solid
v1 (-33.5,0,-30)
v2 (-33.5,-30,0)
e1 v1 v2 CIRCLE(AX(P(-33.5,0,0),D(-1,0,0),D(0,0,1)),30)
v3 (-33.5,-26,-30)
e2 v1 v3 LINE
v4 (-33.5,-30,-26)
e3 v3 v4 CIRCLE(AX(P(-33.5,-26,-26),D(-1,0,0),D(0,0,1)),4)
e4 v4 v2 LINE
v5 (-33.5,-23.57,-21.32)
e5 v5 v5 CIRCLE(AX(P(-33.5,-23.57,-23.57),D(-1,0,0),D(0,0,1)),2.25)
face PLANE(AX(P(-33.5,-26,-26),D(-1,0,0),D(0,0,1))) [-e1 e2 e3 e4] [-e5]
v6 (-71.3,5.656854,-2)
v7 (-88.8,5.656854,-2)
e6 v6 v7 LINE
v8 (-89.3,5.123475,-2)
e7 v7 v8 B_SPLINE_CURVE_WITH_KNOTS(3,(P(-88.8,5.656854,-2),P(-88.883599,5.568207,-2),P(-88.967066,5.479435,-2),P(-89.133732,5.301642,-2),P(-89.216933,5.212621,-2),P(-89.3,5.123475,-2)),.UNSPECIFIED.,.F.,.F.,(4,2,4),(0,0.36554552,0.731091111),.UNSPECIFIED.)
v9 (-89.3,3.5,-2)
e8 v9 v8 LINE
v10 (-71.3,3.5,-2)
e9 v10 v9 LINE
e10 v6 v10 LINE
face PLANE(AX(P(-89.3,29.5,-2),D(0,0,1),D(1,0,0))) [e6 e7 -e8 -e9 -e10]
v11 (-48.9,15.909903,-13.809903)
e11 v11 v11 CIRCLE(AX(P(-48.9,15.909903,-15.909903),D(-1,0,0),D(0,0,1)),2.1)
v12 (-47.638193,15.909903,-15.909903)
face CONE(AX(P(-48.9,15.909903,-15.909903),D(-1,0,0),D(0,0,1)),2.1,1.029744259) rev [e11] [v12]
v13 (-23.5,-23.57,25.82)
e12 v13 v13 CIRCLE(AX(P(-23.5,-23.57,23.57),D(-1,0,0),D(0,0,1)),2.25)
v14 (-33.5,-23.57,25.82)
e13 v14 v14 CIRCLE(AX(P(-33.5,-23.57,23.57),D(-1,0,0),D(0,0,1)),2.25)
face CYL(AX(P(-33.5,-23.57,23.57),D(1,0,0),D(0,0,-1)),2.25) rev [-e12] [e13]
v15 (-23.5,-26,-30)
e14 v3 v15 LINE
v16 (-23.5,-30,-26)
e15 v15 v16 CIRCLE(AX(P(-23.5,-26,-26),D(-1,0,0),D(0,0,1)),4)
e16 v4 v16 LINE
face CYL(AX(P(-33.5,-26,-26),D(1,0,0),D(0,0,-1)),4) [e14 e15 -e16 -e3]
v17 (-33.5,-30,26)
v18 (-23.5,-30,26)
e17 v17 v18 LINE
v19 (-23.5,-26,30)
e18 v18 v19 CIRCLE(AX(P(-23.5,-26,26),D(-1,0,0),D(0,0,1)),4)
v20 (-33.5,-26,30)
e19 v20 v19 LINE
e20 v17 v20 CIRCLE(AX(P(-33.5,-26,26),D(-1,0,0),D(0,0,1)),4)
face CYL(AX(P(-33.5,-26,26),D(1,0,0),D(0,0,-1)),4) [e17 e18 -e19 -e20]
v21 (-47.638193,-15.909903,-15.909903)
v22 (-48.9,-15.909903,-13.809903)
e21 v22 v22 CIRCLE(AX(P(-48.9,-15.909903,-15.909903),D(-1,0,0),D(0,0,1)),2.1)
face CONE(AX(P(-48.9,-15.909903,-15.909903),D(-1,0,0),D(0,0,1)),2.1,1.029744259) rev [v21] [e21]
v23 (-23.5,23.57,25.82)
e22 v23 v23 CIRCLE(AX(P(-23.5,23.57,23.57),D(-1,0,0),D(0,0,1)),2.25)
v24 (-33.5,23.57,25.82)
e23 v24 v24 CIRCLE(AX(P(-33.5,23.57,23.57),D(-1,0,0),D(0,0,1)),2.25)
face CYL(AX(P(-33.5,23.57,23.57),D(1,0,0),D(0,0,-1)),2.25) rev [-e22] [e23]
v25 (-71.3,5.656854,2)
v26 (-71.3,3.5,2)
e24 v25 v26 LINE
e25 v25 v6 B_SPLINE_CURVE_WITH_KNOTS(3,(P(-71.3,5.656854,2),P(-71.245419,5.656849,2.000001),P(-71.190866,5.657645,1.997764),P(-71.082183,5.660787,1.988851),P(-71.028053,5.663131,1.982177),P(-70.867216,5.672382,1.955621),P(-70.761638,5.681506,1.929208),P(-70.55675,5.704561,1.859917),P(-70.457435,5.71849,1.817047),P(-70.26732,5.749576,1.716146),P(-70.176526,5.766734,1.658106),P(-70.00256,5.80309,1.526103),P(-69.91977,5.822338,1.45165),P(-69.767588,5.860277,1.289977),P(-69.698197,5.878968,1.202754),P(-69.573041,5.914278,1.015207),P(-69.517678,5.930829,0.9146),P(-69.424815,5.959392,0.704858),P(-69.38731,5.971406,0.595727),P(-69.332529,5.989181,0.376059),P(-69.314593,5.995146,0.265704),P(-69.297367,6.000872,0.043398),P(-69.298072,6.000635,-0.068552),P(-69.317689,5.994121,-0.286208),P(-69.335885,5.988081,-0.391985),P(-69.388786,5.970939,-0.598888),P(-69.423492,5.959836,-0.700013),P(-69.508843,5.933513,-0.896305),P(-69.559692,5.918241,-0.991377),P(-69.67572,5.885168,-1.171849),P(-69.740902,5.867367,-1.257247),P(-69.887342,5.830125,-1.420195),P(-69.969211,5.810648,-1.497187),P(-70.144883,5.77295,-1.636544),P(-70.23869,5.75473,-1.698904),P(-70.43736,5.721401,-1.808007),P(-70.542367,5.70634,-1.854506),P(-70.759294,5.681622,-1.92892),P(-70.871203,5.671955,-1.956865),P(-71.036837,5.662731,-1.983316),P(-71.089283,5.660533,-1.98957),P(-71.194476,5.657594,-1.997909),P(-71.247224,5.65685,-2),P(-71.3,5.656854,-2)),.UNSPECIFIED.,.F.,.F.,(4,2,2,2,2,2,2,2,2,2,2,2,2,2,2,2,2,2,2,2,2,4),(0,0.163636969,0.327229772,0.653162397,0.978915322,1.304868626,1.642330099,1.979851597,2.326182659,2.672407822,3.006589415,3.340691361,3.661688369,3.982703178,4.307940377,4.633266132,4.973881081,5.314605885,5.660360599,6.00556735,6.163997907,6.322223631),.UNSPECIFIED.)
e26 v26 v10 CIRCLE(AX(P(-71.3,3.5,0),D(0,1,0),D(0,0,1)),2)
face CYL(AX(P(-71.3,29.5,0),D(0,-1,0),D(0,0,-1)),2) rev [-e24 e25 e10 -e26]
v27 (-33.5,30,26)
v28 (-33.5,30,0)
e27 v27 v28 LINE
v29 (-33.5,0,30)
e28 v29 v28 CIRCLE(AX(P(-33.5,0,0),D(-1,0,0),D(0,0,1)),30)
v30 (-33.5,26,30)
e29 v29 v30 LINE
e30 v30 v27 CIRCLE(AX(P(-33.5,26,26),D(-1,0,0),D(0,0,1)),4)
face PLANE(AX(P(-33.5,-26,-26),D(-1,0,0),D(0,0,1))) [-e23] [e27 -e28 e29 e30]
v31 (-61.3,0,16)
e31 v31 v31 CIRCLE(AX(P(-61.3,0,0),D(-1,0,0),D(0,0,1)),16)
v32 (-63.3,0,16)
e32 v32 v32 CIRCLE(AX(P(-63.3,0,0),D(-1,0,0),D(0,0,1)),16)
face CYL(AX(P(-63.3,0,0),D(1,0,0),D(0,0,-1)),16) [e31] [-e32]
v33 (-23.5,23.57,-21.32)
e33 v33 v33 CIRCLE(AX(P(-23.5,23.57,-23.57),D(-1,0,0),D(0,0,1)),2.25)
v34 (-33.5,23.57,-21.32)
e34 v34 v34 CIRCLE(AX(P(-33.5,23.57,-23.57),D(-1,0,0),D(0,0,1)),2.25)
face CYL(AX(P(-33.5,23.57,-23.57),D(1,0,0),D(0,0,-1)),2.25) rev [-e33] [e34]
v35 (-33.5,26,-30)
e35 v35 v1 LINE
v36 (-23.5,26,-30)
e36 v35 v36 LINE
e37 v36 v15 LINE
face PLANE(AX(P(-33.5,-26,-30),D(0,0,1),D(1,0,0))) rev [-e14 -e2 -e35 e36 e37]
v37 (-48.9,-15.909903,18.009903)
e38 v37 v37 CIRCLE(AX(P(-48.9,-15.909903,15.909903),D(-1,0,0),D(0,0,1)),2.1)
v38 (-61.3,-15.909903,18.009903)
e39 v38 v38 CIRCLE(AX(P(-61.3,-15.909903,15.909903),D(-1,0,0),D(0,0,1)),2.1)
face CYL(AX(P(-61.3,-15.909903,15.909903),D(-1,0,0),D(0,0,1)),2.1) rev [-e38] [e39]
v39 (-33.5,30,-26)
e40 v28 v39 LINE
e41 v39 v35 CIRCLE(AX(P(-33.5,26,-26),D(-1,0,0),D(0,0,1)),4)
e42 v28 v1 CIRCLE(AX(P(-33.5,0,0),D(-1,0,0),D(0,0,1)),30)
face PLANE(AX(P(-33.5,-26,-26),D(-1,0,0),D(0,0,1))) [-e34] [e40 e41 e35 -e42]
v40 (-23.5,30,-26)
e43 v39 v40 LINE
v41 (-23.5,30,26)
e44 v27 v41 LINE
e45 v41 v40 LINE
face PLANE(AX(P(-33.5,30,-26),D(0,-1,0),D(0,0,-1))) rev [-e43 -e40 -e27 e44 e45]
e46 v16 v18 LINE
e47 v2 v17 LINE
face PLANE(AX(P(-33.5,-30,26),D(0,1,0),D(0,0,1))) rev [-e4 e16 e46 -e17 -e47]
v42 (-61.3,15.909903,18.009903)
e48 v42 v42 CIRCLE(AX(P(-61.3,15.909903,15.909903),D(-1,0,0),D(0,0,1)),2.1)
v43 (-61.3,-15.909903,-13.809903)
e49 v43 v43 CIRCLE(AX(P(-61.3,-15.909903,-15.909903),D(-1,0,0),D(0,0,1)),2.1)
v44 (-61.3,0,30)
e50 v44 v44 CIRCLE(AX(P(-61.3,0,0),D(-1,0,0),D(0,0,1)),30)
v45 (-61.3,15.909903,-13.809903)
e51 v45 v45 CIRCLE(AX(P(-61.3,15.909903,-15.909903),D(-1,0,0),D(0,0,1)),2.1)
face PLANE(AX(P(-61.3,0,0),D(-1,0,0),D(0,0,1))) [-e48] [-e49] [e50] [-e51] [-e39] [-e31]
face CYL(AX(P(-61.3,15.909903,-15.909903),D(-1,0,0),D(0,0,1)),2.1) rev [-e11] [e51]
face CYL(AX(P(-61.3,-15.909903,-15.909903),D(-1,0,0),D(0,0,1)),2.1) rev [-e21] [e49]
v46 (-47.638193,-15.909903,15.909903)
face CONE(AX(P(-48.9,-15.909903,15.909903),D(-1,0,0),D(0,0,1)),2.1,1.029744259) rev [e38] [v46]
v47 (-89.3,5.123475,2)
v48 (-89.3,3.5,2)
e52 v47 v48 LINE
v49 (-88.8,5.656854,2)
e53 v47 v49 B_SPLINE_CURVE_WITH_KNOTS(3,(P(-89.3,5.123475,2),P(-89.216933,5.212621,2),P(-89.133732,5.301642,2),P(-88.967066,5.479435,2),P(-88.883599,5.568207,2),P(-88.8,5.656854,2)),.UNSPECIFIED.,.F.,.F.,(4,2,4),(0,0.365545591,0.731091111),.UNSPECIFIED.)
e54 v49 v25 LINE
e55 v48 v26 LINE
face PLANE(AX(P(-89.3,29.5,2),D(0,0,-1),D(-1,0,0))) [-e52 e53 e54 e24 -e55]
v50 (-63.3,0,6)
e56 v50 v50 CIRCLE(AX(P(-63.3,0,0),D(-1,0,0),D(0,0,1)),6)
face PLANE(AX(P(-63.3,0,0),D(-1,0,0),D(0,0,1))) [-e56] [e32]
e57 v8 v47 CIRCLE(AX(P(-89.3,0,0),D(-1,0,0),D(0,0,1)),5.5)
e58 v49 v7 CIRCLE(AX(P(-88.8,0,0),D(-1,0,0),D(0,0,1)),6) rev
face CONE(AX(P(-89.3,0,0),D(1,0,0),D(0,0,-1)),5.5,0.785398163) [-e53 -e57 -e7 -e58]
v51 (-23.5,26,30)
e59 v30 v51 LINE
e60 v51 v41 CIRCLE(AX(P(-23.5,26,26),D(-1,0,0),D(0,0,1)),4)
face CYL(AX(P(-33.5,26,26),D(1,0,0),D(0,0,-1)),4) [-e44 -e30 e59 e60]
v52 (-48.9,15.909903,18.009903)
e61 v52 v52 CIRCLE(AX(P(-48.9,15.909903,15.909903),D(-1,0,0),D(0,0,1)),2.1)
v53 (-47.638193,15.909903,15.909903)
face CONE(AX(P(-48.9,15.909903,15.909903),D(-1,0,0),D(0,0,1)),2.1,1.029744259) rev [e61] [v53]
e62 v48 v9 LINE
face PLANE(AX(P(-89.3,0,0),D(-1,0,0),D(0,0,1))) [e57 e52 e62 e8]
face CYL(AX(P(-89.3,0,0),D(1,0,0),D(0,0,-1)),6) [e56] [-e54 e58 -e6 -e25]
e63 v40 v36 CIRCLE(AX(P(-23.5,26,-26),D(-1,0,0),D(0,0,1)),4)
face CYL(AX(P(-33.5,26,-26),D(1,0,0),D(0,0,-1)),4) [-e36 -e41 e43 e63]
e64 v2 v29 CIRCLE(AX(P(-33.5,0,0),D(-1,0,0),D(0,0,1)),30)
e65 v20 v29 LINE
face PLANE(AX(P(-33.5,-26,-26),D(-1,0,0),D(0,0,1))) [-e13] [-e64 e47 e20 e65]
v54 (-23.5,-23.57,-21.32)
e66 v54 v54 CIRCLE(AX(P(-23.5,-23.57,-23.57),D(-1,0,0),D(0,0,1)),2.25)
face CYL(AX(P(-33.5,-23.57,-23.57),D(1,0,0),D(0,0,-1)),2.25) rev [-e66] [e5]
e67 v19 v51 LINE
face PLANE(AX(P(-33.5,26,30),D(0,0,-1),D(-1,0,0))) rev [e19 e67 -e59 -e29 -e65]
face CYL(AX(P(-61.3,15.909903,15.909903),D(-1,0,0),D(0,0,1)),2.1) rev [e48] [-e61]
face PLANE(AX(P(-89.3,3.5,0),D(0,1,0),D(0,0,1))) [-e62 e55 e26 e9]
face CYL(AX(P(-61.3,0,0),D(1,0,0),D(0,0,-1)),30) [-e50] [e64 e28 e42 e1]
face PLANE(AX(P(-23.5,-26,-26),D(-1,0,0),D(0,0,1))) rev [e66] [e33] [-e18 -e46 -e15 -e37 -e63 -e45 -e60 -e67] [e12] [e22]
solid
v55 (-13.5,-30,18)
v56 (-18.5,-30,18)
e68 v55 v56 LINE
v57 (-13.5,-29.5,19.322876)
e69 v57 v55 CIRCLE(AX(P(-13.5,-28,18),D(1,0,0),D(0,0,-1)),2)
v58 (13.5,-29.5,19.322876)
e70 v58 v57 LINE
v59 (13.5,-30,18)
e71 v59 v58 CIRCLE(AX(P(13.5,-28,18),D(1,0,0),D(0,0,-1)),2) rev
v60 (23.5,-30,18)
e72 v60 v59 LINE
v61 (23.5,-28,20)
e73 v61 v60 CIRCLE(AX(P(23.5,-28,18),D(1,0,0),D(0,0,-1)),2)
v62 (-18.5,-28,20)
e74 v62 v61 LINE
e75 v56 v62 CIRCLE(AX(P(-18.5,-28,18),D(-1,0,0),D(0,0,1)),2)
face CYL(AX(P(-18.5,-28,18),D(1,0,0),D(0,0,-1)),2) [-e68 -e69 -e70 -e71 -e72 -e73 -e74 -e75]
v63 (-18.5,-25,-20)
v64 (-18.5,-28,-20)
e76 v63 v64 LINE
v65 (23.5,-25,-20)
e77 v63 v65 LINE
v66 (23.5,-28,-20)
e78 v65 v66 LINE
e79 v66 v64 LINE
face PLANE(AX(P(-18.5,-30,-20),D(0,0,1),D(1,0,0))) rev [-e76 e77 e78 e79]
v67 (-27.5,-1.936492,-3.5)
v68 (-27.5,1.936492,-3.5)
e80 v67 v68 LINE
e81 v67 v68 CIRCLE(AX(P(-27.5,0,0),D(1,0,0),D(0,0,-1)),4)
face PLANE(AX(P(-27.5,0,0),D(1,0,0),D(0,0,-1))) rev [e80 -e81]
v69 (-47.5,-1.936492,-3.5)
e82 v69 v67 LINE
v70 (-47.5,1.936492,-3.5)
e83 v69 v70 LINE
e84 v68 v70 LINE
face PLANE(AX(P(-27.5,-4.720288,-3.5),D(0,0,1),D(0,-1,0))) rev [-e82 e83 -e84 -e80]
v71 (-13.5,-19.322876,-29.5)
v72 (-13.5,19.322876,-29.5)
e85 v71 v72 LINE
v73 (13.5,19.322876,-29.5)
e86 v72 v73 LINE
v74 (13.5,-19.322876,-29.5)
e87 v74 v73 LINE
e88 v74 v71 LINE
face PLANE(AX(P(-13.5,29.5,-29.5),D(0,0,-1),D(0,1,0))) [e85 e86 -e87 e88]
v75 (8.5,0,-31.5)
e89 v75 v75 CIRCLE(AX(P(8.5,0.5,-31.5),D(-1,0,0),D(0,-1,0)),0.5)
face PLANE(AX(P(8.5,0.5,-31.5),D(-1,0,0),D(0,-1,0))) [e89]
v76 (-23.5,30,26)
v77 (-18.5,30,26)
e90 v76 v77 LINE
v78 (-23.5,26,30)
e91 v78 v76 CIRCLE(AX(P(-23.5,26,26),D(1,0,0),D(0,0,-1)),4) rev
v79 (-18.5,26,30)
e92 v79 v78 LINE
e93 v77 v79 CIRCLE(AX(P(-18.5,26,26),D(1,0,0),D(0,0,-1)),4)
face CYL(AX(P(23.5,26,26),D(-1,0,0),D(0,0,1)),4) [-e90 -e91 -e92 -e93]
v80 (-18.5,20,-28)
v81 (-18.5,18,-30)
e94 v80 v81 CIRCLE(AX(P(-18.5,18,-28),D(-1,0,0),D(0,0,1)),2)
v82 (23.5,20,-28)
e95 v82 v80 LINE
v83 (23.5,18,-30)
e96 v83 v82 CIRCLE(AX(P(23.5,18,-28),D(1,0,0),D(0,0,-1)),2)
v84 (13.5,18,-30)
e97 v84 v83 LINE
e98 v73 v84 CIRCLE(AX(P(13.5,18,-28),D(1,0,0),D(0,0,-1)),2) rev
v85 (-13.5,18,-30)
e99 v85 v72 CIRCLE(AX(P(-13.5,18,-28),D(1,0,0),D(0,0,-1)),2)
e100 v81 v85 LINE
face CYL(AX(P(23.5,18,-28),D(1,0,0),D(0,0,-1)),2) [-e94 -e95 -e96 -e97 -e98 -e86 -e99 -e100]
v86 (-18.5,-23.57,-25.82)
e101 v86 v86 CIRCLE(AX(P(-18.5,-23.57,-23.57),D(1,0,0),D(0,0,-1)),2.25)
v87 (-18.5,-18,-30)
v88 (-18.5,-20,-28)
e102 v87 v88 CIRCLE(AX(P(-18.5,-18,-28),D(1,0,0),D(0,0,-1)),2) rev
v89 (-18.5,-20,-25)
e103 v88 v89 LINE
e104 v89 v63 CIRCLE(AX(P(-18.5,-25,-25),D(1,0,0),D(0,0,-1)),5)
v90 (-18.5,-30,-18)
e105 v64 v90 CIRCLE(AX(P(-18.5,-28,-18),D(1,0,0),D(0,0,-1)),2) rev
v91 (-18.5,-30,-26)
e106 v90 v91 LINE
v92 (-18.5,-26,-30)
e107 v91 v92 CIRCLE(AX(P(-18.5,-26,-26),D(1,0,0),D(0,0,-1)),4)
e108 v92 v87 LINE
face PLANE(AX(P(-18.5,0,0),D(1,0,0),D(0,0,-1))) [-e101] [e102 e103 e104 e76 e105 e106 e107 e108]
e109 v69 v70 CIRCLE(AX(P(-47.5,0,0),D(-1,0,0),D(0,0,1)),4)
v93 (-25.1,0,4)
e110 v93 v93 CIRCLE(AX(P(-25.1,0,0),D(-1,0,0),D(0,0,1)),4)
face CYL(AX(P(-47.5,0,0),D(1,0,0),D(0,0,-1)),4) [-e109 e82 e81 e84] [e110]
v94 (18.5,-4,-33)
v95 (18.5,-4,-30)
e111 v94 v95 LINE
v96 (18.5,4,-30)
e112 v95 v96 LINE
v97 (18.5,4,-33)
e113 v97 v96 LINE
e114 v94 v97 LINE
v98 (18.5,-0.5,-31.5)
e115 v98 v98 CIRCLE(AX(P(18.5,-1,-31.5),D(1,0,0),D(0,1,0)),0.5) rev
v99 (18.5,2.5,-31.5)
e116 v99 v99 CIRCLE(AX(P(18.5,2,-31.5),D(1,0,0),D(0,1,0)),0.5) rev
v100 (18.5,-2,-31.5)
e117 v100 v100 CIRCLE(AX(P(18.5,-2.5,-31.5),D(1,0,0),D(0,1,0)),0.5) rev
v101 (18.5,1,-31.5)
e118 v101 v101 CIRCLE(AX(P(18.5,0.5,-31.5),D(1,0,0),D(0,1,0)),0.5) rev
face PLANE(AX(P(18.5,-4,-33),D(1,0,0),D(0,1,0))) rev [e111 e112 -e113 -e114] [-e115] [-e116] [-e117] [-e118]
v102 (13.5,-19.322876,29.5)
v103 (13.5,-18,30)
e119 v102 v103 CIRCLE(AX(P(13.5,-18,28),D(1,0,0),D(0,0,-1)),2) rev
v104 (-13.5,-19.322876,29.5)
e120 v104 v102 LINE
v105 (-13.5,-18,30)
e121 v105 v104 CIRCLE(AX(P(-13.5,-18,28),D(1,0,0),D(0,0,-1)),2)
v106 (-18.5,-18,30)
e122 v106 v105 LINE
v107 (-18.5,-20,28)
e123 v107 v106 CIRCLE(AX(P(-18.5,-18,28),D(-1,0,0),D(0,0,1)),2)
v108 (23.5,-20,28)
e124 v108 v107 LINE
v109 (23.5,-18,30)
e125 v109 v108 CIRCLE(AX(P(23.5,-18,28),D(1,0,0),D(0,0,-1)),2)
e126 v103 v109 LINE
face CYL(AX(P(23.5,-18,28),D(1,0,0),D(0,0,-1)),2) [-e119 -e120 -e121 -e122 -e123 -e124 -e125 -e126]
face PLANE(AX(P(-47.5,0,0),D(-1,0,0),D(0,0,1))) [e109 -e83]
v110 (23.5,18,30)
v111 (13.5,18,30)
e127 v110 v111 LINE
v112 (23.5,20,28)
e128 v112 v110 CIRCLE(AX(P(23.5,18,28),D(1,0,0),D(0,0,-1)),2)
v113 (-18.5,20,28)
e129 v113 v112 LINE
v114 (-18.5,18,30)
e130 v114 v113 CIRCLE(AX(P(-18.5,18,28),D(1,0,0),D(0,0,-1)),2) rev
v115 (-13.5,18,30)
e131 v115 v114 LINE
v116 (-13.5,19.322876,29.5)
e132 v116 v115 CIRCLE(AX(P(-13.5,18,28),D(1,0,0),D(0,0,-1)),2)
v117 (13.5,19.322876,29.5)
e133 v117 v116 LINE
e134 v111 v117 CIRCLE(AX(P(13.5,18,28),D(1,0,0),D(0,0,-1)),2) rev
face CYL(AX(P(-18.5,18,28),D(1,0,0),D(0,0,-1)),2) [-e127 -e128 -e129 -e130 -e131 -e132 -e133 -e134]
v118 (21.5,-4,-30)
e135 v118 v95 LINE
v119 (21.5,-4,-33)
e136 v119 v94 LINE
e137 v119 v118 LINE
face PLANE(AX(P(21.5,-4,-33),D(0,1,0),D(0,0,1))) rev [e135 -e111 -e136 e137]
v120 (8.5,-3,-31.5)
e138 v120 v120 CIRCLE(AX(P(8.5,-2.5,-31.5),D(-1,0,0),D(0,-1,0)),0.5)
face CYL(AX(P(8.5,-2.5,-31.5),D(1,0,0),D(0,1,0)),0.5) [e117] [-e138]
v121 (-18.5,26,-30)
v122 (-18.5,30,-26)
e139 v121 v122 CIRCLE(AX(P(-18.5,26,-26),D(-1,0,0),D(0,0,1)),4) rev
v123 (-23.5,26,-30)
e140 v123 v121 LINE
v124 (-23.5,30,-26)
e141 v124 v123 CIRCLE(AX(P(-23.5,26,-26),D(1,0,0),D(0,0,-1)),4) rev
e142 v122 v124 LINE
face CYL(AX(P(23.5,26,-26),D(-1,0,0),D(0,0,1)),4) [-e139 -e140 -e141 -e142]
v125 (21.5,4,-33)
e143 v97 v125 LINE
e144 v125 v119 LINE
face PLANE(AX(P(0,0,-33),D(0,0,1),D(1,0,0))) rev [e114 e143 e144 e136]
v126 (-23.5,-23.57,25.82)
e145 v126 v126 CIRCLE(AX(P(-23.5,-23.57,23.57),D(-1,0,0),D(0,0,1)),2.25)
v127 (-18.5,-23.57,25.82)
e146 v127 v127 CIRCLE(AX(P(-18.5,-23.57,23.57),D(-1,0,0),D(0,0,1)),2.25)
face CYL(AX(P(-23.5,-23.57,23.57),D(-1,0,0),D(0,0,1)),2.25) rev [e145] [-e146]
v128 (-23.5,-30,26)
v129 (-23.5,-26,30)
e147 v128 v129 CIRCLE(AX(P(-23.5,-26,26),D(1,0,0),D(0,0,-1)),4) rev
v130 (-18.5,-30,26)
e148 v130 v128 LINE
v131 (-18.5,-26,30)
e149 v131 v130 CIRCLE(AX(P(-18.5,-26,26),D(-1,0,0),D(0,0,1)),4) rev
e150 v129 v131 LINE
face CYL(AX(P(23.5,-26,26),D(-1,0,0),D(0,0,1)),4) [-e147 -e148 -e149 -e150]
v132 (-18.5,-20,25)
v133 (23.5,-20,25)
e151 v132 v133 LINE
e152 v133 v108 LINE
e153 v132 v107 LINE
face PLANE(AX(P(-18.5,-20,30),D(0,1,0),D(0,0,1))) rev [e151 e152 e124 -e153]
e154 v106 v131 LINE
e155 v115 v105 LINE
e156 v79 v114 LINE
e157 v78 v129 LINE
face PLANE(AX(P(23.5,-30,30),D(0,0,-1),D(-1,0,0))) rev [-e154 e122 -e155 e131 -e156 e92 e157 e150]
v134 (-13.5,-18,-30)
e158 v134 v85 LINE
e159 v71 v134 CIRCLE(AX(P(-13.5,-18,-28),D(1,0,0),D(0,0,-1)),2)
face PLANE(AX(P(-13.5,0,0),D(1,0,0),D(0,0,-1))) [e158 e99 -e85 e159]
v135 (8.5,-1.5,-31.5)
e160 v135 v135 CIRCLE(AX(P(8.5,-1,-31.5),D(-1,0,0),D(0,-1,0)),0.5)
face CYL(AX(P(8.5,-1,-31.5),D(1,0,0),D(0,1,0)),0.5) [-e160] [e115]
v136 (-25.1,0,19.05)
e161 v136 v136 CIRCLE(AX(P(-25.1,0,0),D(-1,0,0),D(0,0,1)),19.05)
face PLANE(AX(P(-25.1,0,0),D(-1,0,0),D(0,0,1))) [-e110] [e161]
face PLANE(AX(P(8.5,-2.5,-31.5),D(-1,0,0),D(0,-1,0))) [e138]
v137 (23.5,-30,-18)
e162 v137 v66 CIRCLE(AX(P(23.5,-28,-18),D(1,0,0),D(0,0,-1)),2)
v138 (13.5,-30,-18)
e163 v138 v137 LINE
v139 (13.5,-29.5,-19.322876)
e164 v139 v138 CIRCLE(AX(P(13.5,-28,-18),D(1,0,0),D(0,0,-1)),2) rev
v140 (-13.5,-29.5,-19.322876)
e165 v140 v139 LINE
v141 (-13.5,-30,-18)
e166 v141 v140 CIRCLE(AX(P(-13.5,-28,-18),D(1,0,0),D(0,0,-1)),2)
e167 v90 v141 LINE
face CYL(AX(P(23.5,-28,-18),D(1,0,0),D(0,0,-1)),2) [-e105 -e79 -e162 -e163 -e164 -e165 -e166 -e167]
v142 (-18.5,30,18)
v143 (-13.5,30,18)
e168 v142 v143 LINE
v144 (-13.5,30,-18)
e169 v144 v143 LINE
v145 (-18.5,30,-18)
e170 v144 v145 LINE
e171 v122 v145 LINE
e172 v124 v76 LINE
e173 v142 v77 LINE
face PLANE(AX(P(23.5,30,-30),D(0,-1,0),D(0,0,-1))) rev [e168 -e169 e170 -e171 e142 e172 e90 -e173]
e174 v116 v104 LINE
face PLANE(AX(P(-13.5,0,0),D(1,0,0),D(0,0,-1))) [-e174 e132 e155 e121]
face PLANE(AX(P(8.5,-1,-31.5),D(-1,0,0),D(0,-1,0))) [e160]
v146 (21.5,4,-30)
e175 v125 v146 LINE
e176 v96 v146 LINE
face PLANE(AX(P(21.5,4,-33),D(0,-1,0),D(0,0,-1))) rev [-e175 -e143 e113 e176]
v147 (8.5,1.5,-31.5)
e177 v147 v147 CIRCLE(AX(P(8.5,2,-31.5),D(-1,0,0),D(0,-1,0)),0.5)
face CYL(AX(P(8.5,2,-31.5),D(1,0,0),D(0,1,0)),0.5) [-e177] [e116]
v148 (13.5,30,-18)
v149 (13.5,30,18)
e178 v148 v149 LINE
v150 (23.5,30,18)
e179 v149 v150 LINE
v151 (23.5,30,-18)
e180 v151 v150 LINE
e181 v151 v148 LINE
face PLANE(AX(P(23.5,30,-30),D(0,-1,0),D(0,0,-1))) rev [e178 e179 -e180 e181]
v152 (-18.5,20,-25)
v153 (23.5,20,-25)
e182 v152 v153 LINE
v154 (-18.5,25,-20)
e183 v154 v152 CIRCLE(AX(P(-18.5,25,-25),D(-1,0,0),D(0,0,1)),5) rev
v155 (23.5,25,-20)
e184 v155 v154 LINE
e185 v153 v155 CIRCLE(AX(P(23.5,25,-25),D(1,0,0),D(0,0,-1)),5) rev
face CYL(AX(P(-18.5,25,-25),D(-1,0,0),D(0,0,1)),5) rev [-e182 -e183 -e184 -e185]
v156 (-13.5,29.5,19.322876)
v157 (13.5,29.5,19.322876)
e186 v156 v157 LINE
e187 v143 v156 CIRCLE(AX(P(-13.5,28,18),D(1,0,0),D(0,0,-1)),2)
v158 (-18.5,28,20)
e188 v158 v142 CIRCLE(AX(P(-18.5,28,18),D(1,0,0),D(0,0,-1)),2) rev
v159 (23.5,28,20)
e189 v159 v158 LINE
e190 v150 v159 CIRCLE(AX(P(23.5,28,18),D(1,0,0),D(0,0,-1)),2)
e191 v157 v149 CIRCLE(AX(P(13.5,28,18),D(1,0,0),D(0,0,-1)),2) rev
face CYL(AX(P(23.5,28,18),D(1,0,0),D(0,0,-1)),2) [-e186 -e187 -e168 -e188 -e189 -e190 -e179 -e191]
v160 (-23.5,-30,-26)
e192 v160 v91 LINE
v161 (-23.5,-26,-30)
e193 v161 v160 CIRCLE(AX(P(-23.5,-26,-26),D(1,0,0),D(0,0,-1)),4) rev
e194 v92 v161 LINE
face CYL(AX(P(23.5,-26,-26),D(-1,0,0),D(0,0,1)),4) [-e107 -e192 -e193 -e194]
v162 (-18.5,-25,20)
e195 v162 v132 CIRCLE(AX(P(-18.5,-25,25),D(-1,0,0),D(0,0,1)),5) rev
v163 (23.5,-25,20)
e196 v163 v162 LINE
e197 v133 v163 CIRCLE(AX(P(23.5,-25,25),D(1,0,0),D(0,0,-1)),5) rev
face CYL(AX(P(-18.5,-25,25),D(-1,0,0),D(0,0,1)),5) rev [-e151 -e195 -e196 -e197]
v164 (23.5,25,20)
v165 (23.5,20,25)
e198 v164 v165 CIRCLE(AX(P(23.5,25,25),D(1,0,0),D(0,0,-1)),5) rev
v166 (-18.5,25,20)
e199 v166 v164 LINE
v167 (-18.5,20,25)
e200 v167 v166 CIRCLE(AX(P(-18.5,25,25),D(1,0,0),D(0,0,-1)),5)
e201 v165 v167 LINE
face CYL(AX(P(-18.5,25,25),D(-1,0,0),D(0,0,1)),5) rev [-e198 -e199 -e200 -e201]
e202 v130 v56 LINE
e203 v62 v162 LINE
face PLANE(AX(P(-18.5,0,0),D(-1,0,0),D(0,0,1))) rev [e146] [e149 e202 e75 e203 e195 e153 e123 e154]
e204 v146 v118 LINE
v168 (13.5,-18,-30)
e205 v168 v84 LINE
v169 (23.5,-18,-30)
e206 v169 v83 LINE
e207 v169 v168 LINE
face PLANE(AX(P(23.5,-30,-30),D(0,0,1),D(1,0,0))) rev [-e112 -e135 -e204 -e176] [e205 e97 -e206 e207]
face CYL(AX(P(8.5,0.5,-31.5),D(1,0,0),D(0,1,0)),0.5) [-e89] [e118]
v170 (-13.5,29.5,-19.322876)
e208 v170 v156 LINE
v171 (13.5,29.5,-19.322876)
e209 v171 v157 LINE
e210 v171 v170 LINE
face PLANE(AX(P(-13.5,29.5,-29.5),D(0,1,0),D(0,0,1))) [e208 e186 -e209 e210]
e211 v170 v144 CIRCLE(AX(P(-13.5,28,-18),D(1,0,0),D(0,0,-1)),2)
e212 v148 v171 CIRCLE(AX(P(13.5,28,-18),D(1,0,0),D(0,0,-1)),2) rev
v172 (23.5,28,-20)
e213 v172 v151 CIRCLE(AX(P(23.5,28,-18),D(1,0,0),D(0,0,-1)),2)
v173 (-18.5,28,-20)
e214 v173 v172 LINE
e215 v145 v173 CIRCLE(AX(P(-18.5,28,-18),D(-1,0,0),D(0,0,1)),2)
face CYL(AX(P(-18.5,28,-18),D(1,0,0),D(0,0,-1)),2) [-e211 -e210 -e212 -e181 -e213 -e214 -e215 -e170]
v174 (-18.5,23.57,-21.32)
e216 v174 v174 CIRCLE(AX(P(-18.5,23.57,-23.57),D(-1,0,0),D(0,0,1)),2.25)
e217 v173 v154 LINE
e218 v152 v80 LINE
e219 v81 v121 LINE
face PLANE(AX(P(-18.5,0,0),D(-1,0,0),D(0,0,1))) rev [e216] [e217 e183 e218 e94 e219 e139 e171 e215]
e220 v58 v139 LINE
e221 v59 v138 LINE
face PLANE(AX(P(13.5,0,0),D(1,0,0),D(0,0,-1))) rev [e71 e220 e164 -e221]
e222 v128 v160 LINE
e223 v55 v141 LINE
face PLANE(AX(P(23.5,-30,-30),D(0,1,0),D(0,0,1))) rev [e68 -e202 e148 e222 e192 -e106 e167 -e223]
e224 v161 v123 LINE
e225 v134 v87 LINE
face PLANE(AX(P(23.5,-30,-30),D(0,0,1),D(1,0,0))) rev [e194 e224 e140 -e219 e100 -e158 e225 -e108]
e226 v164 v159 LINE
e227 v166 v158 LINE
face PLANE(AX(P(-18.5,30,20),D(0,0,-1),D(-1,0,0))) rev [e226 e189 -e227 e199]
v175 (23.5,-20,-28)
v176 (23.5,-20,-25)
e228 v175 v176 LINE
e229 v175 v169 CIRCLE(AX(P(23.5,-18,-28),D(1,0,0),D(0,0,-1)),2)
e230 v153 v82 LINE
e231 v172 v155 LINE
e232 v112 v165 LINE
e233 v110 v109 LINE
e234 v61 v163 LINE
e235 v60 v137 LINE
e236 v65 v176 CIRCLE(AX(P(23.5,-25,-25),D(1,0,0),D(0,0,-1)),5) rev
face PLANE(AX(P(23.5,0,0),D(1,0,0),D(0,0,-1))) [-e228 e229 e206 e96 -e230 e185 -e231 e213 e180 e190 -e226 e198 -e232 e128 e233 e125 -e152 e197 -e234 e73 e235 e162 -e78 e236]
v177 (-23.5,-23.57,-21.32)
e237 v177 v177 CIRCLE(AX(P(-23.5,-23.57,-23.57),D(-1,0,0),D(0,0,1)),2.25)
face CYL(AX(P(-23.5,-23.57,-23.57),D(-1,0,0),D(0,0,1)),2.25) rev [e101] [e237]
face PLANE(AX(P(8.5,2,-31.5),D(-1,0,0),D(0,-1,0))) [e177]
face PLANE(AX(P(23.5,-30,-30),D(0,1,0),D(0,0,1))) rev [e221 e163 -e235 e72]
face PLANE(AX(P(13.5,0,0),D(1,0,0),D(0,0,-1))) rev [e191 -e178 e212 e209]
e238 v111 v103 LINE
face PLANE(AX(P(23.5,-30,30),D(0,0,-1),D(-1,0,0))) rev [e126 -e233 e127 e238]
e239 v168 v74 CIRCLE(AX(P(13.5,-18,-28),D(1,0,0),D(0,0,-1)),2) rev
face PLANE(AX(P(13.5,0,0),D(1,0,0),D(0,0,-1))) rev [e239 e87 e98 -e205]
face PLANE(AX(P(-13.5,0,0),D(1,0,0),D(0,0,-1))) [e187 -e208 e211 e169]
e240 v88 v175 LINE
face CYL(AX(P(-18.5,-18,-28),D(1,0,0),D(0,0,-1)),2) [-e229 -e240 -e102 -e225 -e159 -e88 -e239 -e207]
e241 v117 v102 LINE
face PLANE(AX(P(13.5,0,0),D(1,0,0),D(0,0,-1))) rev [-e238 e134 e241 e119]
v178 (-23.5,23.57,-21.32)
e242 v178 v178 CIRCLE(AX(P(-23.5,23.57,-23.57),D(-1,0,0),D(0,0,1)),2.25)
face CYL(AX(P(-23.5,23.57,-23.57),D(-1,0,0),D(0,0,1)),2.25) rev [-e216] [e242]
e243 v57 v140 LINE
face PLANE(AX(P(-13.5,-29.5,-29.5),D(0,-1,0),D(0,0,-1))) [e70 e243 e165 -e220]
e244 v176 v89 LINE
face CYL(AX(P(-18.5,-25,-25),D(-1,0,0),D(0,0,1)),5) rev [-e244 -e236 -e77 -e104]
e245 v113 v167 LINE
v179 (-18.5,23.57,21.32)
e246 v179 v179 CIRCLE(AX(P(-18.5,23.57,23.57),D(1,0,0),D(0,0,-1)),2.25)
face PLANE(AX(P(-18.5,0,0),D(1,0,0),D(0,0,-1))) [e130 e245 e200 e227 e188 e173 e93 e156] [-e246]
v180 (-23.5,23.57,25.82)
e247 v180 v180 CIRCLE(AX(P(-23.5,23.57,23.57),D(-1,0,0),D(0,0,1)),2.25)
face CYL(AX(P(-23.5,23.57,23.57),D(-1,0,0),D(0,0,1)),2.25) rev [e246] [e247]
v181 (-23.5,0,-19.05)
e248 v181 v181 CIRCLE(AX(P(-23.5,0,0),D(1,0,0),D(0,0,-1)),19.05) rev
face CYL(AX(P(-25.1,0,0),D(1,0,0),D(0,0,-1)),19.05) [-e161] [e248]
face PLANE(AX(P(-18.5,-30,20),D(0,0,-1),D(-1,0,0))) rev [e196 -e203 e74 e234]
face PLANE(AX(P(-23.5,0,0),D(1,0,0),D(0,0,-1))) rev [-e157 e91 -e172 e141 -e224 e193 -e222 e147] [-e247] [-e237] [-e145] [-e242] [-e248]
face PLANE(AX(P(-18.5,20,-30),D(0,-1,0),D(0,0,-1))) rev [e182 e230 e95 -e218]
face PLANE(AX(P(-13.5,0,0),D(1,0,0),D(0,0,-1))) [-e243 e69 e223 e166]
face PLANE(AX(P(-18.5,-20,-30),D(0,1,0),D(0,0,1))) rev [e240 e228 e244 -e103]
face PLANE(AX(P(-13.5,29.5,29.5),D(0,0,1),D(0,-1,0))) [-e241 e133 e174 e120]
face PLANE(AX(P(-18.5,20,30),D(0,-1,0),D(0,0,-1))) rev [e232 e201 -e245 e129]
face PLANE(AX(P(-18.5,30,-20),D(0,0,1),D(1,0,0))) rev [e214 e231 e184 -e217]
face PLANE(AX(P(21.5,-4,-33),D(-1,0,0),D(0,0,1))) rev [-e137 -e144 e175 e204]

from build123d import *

# Parameters (mm, degrees)
SKETCH_1_W                  = 60
SKETCH_1_H                  = 60
EXTRUDE_1_DEPTH             = 23.5
SKETCH_7_W                  = 60
SKETCH_7_H                  = 60
SKETCH_7_W_2                = 59
SKETCH_7_H_2                = 59
CUT_EXTRUDE_1_DEPTH         = 13.5
SKETCH_2_R                  = 19.05
EXTRUDE_2_DEPTH             = 1.6
SKETCH_3_R                  = 4
EXTRUDE_3_DEPTH             = 22.4
SKETCH_10_W                 = 3
SKETCH_10_H                 = 8
EXTRUDE_4_DEPTH             = 3
SKETCH_14_W                 = 4.023193039
SKETCH_14_H                 = 9.052092363
CUT_EXTRUDE_3_DEPTH         = 20
SKETCH_12_W                 = 10
SKETCH_12_H                 = 10
CUT_EXTRUDE_2_DEPTH         = 42
SKETCH_15_R                 = 0.5
EXTRUDE_5_DEPTH             = 10
FILLET_2_R                  = 5
FILLET_START                = -18.5
FILLET_3_DEPTH              = 42.5
HOLE_WIZARD_4_5_4_5_1_D     = 4.5
HOLE_WIZARD_4_5_4_5_1_DEPTH = 10
HOLE_WIZARD_4_5_4_5_1_TIP   = 1.351936393
FILLET_1_R                  = 4
SKETCH_17_R                 = 2.25
EXTRUDE_7_DEPTH             = 10
SKETCH_18_R                 = 30
EXTRUDE_8_DEPTH             = 27.8
SKETCH_19_R                 = 16
EXTRUDE_9_DEPTH             = 2
SKETCH_20_R                 = 6
EXTRUDE_10_DEPTH            = 26
CUT_EXTRUDE_START           = 3.5
CUT_EXTRUDE_4_DEPTH         = 26
CHAMFER_1_SIZE              = 0.5
HOLE_WIZARD_M5_1_AT_2_COUNT = 2
HOLE_WIZARD_M5_1_AT_2_PITCH = 31.819805153
HOLE_WIZARD_M5_1_AT_3_COUNT = 2
HOLE_WIZARD_M5_1_AT_3_PITCH = 45
HOLE_WIZARD_M5_1_AT_4_COUNT = 2
HOLE_WIZARD_M5_1_AT_4_PITCH = 31.819805153


with BuildPart() as part:
    # 草图1 → 凸台-拉伸1 (new, symmetric)
    with BuildSketch(Plane(origin=(0, 0, 0), x_dir=(0, 0, -1), z_dir=(1, 0, 0))):
        Rectangle(SKETCH_1_W, SKETCH_1_H)
    extrude(amount=EXTRUDE_1_DEPTH, both=True)

    # 草图7 → 切除-拉伸1 (cut, symmetric)
    with BuildSketch(Plane(origin=(0, 0, 0), x_dir=(0, 0, -1), z_dir=(1, 0, 0))):
        Rectangle(SKETCH_7_W, SKETCH_7_H)
        Rectangle(SKETCH_7_W_2, SKETCH_7_H_2, mode=Mode.SUBTRACT)
    extrude(amount=CUT_EXTRUDE_1_DEPTH, both=True, mode=Mode.SUBTRACT)

    # 草图2 → 凸台-拉伸2 (add)
    with BuildSketch(Plane.ZY.offset(23.5)):
        with Locations(Location((0, 0, 0), (0, 0, 180))):
            Circle(SKETCH_2_R)
    extrude(amount=EXTRUDE_2_DEPTH)

    # 草图3 → 凸台-拉伸3 (add)
    with BuildSketch(Plane.ZY.offset(25.1)):
        Circle(SKETCH_3_R)
    extrude(amount=EXTRUDE_3_DEPTH)

    # 草图10 → 凸台-拉伸4 (add)
    with BuildSketch(Plane(origin=(0, 0, -30), x_dir=(-1, 0, 0), z_dir=(0, 0, -1))):
        with Locations((-20, 0)):
            Rectangle(SKETCH_10_W, SKETCH_10_H)
    extrude(amount=EXTRUDE_4_DEPTH)

    # 草图14 → 切除-拉伸3 (cut)
    with BuildSketch(Plane.ZY.offset(47.5)):
        with Locations((-5.51159652, -0.194241877)):
            Rectangle(SKETCH_14_W, SKETCH_14_H)
    extrude(amount=-CUT_EXTRUDE_3_DEPTH, mode=Mode.SUBTRACT)

    # 草图12 → 切除-拉伸2 (cut)
    with BuildSketch(Plane(origin=(23.5, 0, 0), x_dir=(0, 0, -1), z_dir=(1, 0, 0))):
        with Locations((25, -25)):
            Rectangle(SKETCH_12_W, SKETCH_12_H)
        with Locations((-25, -25)):
            Rectangle(SKETCH_12_W, SKETCH_12_H)
        with Locations((-25, 25)):
            Rectangle(SKETCH_12_W, SKETCH_12_H)
        with Locations((25, 25)):
            Rectangle(SKETCH_12_W, SKETCH_12_H)
    extrude(amount=-CUT_EXTRUDE_2_DEPTH, mode=Mode.SUBTRACT)

    # 草图15 → 凸台-拉伸5 (add)
    with BuildSketch(Plane.ZY.offset(-18.5)):
        with Locations(Location((-31.5, -2.5, 0), (0, 0, 90))):
            Circle(SKETCH_15_R)
        with Locations(Location((-31.5, -1, 0), (0, 0, 90))):
            Circle(SKETCH_15_R)
        with Locations(Location((-31.5, 0.5, 0), (0, 0, 90))):
            Circle(SKETCH_15_R)
        with Locations(Location((-31.5, 2, 0), (0, 0, 90))):
            Circle(SKETCH_15_R)
    extrude(amount=EXTRUDE_5_DEPTH)

    # 圆角2
    fillet_2_edges = [part.edges().sort_by_distance(p)[0] for p in [
        (2.5, -20, 20),
        (2.5, 20, 20),
        (2.5, 20, -20),
        (2.5, -20, -20),
    ]]
    fillet(fillet_2_edges, radius=FILLET_2_R)

    # 圆角3: read off the stored shape, not the designer's step
    # 圆角3 outline → 圆角3 (cut)
    with BuildSketch(Plane.YZ.offset(FILLET_START)):
        with BuildLine():
            Line((30, 18), (30, 20))
            Line((30, 20), (28, 20))
            ThreePointArc((28, 20), (29.414213562, 19.414213562), (30, 18))
        make_face()
        with BuildLine():
            Line((30, -20), (30, -18))
            ThreePointArc((30, -18), (29.414213562, -19.414213562), (28, -20))
            Line((28, -20), (30, -20))
        make_face()
        with BuildLine():
            Line((20, 30), (18, 30))
            ThreePointArc((18, 30), (19.414213562, 29.414213562), (20, 28))
            Line((20, 28), (20, 30))
        make_face()
        with BuildLine():
            Line((18, -30), (20, -30))
            Line((20, -30), (20, -28))
            ThreePointArc((20, -28), (19.414213562, -29.414213562), (18, -30))
        make_face()
        with BuildLine():
            Line((-18, 30), (-20, 30))
            Line((-20, 30), (-20, 28))
            ThreePointArc((-20, 28), (-19.414213562, 29.414213562), (-18, 30))
        make_face()
        with BuildLine():
            Line((-20, -30), (-18, -30))
            ThreePointArc((-18, -30), (-19.414213562, -29.414213562), (-20, -28))
            Line((-20, -28), (-20, -30))
        make_face()
        with BuildLine():
            Line((-30, 20), (-30, 18))
            ThreePointArc((-30, 18), (-29.414213562, 19.414213562), (-28, 20))
            Line((-28, 20), (-30, 20))
        make_face()
        with BuildLine():
            Line((-30, -18), (-30, -20))
            Line((-30, -20), (-28, -20))
            ThreePointArc((-28, -20), (-29.414213562, -19.414213562), (-30, -18))
        make_face()
    extrude(amount=FILLET_3_DEPTH, mode=Mode.SUBTRACT)

    # Ø4.5 (4.5) 直径孔1
    with Locations(Plane.ZY.offset(23.5)):
        with Locations((-23.57, 23.57), (23.57, 23.57), (23.57, -23.57), (-23.57, -23.57)):
            Hole(HOLE_WIZARD_4_5_4_5_1_D / 2, depth=HOLE_WIZARD_4_5_4_5_1_DEPTH)
            with Locations((0, 0, -(HOLE_WIZARD_4_5_4_5_1_DEPTH + HOLE_WIZARD_4_5_4_5_1_TIP / 2))):  # 118° drill point
                Cone(0, HOLE_WIZARD_4_5_4_5_1_D / 2, HOLE_WIZARD_4_5_4_5_1_TIP, mode=Mode.SUBTRACT)

    # 圆角1
    fillet_1_edges = [part.edges().sort_by_distance(p)[0] for p in [
        (-21, -30, 30),
        (-21, 30, 30),
        (-21, 30, -30),
        (-21, -30, -30),
    ]]
    fillet(fillet_1_edges, radius=FILLET_1_R)


with BuildPart() as body_2:
    # 草图17 → 凸台-拉伸7 (new body)
    with BuildSketch(Plane.ZY.offset(23.5)):
        with BuildLine():
            Line((-30, -26), (-30, 26))
            ThreePointArc((-30, 26), (-28.828427125, 28.828427125), (-26, 30))
            Line((-26, 30), (26, 30))
            ThreePointArc((26, 30), (28.828427125, 28.828427125), (30, 26))
            Line((30, 26), (30, -26))
            ThreePointArc((30, -26), (28.828427125, -28.828427125), (26, -30))
            Line((26, -30), (-26, -30))
            ThreePointArc((-26, -30), (-28.828427125, -28.828427125), (-30, -26))
        make_face()
        with Locations((-23.57, -23.57)):
            Circle(SKETCH_17_R, mode=Mode.SUBTRACT)
        with Locations((-23.57, 23.57)):
            Circle(SKETCH_17_R, mode=Mode.SUBTRACT)
        with Locations((23.57, 23.57)):
            Circle(SKETCH_17_R, mode=Mode.SUBTRACT)
        with Locations((23.57, -23.57)):
            Circle(SKETCH_17_R, mode=Mode.SUBTRACT)
    extrude(amount=EXTRUDE_7_DEPTH)

    # 草图18 → 凸台-拉伸8 (add)
    with BuildSketch(Plane.ZY.offset(33.5)):
        Circle(SKETCH_18_R)
    extrude(amount=EXTRUDE_8_DEPTH)

    # 草图19 → 凸台-拉伸9 (add)
    with BuildSketch(Plane.ZY.offset(61.3)):
        Circle(SKETCH_19_R)
    extrude(amount=EXTRUDE_9_DEPTH)

    # 草图20 → 凸台-拉伸10 (add)
    with BuildSketch(Plane.ZY.offset(63.3)):
        with Locations(Location((0, 0, 0), (0, 0, 180))):
            Circle(SKETCH_20_R)
    extrude(amount=EXTRUDE_10_DEPTH)

    # 草图21 → 切除-拉伸4 (cut)
    with BuildSketch(Plane(origin=(0, 0, 0), x_dir=(1, 0, 0), z_dir=(0, 1, 0)).offset(CUT_EXTRUDE_START)):
        with BuildLine():
            Line((-89.3, 2), (-71.3, 2))
            ThreePointArc((-71.3, 2), (-69.3, 0), (-71.3, -2))
            Line((-71.3, -2), (-89.3, -2))
            ThreePointArc((-89.3, -2), (-91.3, 0), (-89.3, 2))
        make_face()
    extrude(amount=CUT_EXTRUDE_4_DEPTH, mode=Mode.SUBTRACT)

    # 倒角1
    chamfer_1_edges = [body_2.edges().sort_by_distance(p)[0] for p in [
        (-89.3, -4.898979486, 3.464101615),
    ]]
    chamfer(chamfer_1_edges, length=CHAMFER_1_SIZE)

    # 草图23 → M5 螺纹孔1 (revolve, cut)
    with BuildSketch(Plane(origin=(-61.3, 15.909902577, -15.909902577), x_dir=(0, 0, 1), z_dir=(0, 1, 0))):
        Polygon((0, 0), (0, 13.6618073), (2.1, 12.4), (2.1, 0), align=None)
    hole_wizard_m5_1 = revolve(axis=Axis((-67.65, 15.909902577, -15.909902577), (1, 0, 0)), mode=Mode.SUBTRACT)

    # M5 螺纹孔1 at 2: M5 螺纹孔1 ×2
    with Locations(*[(0, 0, i * HOLE_WIZARD_M5_1_AT_2_PITCH) for i in range(1, HOLE_WIZARD_M5_1_AT_2_COUNT)]):
        add(hole_wizard_m5_1, mode=Mode.SUBTRACT)

    # M5 螺纹孔1 at 3: M5 螺纹孔1 ×2
    with Locations(*[Vector(0, -0.7071067811865475, 0.7071067811865477) * (i * HOLE_WIZARD_M5_1_AT_3_PITCH) for i in range(1, HOLE_WIZARD_M5_1_AT_3_COUNT)]):
        add(hole_wizard_m5_1, mode=Mode.SUBTRACT)

    # M5 螺纹孔1 at 4: M5 螺纹孔1 ×2
    with Locations(*[(0, -i * HOLE_WIZARD_M5_1_AT_4_PITCH, 0) for i in range(1, HOLE_WIZARD_M5_1_AT_4_COUNT)]):
        add(hole_wizard_m5_1, mode=Mode.SUBTRACT)


solid = Compound([part.part, body_2.part])
